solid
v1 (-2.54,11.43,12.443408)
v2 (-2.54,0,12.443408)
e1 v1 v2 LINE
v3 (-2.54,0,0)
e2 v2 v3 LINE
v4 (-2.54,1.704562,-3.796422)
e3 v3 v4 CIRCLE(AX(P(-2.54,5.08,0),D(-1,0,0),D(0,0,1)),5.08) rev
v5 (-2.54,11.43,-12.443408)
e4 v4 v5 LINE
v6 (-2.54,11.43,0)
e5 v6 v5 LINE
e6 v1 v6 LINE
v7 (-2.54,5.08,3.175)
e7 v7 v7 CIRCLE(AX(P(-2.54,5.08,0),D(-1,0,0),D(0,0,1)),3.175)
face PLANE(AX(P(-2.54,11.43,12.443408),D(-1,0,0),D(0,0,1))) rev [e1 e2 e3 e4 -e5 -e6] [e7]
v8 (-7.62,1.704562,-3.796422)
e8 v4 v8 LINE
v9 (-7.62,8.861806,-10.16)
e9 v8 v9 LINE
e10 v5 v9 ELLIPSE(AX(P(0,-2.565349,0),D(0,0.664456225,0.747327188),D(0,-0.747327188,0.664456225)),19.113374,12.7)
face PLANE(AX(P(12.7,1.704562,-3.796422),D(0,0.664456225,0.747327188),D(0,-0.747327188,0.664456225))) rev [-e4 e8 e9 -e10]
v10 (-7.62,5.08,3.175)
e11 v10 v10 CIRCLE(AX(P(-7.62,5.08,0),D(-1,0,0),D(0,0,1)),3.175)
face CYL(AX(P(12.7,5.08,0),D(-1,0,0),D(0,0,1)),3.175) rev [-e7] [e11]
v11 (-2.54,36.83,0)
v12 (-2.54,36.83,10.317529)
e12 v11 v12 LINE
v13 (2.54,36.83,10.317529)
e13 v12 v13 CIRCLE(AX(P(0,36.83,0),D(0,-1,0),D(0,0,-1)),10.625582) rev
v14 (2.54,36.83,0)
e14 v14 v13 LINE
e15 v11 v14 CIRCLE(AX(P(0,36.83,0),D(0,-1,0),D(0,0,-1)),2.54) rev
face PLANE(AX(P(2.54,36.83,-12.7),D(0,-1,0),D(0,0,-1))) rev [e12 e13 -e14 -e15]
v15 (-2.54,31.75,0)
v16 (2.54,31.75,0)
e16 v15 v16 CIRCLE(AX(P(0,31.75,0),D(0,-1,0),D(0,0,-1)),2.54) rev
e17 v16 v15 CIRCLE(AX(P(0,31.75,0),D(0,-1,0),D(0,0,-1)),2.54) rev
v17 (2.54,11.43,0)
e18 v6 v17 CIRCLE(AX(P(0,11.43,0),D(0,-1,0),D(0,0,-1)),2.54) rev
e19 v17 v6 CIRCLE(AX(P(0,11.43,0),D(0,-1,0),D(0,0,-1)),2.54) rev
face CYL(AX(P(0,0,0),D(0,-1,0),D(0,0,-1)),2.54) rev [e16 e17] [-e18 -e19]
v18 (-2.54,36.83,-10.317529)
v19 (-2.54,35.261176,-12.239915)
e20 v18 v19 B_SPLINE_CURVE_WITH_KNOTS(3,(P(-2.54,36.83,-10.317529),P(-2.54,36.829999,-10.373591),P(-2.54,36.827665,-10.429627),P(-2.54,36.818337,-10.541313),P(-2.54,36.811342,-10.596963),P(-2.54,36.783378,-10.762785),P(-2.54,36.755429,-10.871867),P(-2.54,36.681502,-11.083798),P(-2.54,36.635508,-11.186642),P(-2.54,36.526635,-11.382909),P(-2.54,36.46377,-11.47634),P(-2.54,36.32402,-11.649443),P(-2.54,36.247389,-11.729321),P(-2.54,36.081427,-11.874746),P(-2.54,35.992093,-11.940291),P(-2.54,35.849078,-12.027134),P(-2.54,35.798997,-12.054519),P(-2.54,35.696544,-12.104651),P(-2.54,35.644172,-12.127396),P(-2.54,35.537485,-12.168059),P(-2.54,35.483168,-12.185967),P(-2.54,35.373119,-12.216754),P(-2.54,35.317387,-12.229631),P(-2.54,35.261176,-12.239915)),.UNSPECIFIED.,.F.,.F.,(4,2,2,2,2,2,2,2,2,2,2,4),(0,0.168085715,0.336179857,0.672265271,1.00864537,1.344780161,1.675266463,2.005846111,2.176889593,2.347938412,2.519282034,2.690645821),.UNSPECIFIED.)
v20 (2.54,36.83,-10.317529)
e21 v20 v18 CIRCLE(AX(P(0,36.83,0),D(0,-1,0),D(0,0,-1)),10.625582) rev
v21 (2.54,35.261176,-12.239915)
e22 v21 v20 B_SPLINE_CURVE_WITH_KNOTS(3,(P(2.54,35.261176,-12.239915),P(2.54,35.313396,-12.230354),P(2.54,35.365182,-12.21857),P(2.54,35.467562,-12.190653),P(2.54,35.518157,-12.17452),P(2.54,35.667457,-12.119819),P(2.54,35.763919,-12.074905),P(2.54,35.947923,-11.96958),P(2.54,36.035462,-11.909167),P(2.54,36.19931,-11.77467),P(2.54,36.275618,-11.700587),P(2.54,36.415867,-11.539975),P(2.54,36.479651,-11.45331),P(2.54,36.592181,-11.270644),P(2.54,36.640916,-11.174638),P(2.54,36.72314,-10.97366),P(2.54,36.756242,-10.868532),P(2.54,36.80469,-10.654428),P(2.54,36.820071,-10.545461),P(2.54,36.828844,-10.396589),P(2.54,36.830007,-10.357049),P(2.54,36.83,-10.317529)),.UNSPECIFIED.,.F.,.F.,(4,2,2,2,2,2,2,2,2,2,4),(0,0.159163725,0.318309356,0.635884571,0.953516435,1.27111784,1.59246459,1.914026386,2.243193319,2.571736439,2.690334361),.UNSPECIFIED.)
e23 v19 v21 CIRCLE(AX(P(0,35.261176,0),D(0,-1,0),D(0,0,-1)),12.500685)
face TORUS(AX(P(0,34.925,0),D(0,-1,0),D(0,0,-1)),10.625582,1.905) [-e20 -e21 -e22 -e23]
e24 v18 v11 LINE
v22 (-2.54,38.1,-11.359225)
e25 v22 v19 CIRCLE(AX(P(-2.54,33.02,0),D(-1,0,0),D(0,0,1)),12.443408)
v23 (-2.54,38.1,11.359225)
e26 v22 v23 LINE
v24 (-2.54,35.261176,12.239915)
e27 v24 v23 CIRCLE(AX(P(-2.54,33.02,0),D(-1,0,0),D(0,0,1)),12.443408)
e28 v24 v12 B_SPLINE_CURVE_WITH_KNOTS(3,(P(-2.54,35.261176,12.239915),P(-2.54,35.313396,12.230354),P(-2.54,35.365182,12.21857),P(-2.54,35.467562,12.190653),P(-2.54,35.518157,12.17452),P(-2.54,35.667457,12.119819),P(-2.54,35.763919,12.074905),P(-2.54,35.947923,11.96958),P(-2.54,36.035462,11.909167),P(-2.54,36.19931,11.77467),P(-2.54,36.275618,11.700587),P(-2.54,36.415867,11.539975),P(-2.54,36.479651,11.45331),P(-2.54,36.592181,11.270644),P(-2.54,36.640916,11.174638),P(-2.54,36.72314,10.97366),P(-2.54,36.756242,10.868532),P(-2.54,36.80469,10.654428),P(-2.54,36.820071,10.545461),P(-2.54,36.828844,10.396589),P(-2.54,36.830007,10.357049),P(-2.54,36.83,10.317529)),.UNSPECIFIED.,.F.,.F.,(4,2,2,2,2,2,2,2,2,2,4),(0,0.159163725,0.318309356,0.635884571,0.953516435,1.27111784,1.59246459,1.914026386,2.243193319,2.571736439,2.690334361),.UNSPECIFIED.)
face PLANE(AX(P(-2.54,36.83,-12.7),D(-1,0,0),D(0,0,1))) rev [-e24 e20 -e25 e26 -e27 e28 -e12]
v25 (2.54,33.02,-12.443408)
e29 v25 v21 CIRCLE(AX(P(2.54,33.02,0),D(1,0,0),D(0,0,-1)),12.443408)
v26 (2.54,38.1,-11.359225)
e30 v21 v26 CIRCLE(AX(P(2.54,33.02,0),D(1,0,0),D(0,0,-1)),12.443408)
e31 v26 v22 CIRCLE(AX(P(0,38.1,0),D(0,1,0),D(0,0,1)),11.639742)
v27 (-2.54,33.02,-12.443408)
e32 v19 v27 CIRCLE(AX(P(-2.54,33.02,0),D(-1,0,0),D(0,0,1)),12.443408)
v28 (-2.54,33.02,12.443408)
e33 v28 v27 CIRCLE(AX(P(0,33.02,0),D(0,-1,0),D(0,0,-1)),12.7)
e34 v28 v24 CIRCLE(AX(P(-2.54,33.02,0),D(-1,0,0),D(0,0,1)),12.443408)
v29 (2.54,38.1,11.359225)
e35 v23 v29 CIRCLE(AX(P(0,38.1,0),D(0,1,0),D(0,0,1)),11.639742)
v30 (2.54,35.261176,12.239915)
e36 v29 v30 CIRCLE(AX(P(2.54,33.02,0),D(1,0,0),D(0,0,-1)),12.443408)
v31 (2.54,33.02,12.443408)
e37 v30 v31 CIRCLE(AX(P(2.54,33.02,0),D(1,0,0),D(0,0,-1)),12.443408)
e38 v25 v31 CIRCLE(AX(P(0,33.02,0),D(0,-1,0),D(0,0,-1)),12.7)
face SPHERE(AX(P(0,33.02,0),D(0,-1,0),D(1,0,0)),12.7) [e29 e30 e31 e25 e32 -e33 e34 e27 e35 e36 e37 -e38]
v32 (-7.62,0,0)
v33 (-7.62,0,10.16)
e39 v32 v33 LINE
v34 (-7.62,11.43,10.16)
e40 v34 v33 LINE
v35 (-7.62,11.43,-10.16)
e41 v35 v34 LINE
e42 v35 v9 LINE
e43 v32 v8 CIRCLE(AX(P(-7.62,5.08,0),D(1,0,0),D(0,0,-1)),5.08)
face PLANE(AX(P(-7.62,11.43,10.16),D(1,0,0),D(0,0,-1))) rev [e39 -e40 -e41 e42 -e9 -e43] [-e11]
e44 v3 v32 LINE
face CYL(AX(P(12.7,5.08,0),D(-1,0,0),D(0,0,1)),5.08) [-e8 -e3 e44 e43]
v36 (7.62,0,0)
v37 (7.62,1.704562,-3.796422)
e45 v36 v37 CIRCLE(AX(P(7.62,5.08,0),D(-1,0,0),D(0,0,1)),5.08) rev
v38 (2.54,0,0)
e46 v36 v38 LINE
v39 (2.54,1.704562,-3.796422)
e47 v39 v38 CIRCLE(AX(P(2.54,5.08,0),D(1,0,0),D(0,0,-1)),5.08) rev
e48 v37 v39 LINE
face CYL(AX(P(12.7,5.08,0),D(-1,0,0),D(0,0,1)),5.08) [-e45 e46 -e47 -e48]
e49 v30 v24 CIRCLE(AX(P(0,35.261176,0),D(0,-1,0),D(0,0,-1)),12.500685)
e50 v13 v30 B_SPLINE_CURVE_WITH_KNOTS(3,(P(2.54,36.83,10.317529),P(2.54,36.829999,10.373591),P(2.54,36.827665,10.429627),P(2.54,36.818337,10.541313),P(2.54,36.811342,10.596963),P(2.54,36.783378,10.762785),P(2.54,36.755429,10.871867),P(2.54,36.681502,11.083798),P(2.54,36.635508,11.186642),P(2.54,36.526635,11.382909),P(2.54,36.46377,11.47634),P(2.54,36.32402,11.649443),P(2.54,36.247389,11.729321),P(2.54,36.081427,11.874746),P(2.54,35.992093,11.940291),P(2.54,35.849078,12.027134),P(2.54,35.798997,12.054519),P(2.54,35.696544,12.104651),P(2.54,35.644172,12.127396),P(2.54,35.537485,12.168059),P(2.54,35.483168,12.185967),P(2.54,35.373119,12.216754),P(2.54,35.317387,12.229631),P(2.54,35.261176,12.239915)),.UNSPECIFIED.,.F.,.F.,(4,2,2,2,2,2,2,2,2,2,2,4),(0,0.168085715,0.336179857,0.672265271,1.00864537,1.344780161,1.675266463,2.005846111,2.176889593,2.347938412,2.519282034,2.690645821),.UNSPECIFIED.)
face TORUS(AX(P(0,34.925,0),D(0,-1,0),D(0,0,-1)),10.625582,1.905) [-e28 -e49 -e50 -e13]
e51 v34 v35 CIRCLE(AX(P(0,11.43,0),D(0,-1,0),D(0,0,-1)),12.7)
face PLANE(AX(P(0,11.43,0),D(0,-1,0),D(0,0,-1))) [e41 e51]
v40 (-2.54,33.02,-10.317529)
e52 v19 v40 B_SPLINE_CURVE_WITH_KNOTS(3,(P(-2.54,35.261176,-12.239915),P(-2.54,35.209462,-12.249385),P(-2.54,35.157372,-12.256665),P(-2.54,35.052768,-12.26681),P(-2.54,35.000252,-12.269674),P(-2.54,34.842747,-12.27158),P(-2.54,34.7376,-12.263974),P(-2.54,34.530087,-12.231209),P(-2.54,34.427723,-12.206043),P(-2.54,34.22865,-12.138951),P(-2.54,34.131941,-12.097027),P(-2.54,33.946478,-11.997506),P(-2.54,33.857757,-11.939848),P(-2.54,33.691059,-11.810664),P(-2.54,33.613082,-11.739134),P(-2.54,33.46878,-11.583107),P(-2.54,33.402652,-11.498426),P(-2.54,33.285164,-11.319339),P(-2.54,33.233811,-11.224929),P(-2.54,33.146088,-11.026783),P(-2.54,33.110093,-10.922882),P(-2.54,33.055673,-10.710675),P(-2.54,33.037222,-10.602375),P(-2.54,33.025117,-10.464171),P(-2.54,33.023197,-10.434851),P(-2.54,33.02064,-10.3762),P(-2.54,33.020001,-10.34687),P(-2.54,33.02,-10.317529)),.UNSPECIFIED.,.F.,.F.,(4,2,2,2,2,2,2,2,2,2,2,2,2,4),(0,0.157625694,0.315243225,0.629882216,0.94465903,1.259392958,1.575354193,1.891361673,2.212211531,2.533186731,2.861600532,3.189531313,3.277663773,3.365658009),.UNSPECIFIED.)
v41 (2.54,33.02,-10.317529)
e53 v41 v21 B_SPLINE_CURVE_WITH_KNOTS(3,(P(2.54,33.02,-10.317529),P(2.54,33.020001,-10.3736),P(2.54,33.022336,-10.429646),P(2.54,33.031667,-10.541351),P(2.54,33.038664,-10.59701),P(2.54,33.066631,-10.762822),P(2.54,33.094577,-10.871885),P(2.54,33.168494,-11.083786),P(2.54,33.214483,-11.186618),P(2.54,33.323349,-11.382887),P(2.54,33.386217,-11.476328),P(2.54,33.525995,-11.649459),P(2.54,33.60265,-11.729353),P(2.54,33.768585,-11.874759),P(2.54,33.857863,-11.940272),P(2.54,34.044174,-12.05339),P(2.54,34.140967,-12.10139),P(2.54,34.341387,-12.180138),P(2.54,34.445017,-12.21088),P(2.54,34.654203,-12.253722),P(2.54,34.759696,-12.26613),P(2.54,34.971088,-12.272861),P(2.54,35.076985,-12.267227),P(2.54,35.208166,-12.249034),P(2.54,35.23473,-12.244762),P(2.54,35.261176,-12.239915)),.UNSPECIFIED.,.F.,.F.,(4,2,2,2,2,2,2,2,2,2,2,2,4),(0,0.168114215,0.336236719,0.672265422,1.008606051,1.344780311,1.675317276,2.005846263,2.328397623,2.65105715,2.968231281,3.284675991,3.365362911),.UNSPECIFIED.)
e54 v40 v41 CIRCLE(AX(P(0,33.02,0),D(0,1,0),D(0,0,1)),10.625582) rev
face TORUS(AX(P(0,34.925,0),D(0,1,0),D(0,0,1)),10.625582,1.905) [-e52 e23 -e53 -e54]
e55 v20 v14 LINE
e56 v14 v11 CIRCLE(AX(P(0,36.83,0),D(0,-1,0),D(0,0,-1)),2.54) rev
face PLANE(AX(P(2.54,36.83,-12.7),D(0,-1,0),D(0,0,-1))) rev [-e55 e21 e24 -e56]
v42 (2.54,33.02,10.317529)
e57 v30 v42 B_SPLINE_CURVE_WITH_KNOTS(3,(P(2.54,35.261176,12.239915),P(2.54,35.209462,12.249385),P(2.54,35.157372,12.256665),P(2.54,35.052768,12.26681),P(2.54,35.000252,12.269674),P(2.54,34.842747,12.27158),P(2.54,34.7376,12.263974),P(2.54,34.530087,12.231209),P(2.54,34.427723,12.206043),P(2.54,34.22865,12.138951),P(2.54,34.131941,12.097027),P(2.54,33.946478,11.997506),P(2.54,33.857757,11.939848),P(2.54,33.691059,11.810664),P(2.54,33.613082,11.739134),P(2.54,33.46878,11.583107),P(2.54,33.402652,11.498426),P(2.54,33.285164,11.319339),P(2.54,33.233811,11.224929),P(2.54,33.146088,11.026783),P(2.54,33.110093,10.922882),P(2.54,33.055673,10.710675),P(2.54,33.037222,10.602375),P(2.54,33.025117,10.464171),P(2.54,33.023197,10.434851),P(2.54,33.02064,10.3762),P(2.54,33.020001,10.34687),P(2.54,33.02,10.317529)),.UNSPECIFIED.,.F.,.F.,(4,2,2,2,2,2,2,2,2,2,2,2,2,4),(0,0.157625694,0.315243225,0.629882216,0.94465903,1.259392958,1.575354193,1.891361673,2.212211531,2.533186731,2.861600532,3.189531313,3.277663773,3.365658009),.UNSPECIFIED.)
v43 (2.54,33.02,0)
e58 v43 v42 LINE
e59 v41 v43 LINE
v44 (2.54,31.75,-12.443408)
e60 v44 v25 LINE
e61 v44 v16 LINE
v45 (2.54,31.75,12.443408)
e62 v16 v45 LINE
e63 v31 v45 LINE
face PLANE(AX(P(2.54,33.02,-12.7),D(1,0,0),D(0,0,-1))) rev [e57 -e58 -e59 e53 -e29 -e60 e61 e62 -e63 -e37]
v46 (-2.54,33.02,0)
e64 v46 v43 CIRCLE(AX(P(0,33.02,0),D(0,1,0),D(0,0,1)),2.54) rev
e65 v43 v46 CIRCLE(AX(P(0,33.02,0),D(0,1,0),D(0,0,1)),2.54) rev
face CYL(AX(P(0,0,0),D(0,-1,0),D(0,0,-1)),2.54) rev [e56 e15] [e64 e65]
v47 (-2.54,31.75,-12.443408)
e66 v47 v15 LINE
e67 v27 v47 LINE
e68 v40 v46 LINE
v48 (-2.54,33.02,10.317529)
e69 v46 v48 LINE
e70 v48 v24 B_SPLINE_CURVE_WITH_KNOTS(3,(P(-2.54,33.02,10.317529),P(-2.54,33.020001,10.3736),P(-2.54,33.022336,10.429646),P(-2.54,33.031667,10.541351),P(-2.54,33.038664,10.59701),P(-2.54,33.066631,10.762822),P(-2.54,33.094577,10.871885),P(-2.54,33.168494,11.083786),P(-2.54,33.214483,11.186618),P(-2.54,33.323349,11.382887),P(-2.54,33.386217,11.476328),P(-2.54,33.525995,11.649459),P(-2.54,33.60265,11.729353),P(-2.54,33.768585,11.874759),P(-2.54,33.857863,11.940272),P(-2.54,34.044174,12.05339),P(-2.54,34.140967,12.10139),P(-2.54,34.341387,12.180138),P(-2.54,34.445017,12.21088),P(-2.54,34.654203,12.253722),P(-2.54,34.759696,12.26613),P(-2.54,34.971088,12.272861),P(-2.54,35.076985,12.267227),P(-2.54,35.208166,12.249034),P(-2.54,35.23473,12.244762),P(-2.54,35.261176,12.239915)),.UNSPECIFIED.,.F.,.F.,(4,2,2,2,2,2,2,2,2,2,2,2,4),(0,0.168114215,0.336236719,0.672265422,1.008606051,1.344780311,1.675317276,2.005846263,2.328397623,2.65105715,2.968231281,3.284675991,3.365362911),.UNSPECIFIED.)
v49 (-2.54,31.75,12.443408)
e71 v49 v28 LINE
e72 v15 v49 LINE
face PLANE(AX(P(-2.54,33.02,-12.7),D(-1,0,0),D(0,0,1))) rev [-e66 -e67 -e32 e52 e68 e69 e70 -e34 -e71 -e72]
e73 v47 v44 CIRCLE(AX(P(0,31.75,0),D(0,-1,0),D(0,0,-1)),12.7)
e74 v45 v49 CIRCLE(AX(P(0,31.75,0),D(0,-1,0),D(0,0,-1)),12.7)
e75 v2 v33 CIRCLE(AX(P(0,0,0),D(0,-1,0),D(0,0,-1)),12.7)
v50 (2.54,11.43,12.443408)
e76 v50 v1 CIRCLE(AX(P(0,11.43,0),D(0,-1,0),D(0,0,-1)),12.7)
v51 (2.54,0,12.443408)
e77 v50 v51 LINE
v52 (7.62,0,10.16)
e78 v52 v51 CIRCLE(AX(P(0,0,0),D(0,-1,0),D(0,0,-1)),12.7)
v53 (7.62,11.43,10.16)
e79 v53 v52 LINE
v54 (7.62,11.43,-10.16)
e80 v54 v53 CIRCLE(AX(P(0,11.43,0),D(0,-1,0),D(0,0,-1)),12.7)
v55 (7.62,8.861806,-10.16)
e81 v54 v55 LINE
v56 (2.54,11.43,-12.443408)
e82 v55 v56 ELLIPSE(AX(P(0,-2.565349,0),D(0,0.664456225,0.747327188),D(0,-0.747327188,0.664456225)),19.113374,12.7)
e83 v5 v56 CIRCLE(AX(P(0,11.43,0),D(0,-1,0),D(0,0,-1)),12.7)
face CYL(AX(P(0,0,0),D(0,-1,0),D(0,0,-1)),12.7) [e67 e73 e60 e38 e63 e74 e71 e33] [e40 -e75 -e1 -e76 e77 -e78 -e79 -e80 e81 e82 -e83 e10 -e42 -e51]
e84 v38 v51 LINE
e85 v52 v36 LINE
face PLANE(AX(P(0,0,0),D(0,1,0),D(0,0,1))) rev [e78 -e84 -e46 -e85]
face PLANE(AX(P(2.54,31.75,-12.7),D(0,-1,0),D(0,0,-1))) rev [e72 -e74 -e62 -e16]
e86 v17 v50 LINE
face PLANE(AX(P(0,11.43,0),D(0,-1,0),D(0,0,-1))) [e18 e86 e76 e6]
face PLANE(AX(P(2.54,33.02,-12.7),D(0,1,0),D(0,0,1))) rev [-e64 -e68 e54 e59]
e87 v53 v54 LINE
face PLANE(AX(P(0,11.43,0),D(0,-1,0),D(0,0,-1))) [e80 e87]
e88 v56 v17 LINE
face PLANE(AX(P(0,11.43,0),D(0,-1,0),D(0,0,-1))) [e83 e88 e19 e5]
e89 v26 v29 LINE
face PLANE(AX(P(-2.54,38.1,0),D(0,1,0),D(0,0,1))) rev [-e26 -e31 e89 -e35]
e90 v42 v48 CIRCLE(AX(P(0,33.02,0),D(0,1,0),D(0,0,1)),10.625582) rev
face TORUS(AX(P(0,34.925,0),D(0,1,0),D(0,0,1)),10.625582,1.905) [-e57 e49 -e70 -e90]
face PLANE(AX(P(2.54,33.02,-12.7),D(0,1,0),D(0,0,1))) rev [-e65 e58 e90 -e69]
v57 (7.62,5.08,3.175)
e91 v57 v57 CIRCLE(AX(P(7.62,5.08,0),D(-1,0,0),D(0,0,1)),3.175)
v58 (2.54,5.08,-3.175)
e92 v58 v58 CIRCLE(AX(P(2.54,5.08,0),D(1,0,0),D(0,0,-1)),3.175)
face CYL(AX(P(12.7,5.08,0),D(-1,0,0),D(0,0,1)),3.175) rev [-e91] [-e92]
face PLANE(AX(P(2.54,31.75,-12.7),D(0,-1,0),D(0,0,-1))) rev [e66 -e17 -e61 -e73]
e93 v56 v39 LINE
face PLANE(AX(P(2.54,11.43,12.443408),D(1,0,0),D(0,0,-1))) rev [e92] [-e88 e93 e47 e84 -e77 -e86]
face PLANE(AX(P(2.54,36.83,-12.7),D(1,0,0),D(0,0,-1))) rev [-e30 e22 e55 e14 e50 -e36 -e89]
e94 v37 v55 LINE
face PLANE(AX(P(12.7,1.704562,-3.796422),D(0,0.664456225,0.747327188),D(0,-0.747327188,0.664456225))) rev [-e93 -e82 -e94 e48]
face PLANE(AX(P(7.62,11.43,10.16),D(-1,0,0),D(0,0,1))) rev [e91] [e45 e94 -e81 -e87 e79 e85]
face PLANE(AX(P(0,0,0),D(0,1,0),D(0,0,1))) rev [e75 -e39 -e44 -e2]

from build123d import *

# Parameters (mm, degrees)
CUT_EXTRUDE1_DEPTH      = 11.43
SKETCH3_R               = 3.175
CUT_EXTRUDE2_DEPTH      = 52.61889964
CUT_EXTRUDE3_DEPTH      = 50.121262199
CUT_EXTRUDE3_DEPTH_BACK = 50.121262199
SKETCH4_W               = 5.08
SKETCH4_H               = 1.27
FILLET1_R               = 1.905


with BuildPart() as part:
    # Sketch1 → Revolve1 (revolve)
    with BuildSketch(Plane.XY, mode=Mode.PRIVATE) as revolve1_sk:
        with BuildLine():
            Line((0, 0), (0, 5.602635041))
            Line((0, 5.602635041), (-2.54, 5.602635041))
            Line((-2.54, 5.602635041), (-2.54, 38.1))
            Line((-2.54, 38.1), (0, 38.1))
            Line((0, 38.1), (0, 45.72))
            ThreePointArc((0, 45.72), (-8.980256121, 42.000256121), (-12.7, 33.02))
            Line((-12.7, 33.02), (-12.7, 0))
            Line((-12.7, 0), (0, 0))
        make_face()
    revolve(revolve1_sk.sketch.rotate(Axis((0, 0, 0), (0, 1, 0)), 270), axis=Axis((0, 0, 0), (0, 1, 0)))

    # Sketch2 → Cut-Extrude1 (cut)
    with BuildSketch(Plane.XZ):
        with BuildLine():
            Line((-2.54, 12.443407893), (-2.54, -12.443407893))
            ThreePointArc((-2.54, -12.443407893), (0, -12.7), (2.54, -12.443407893))
            Line((2.54, -12.443407893), (2.54, 12.443407893))
            ThreePointArc((2.54, 12.443407893), (0, 12.7), (-2.54, 12.443407893))
        make_face()
        with BuildLine():
            Line((-7.62, 10.16), (-7.62, -10.16))
            ThreePointArc((-7.62, -10.16), (-12.7, 0), (-7.62, 10.16))
        make_face()
        with BuildLine():
            Line((7.62, 10.16), (7.62, -10.16))
            ThreePointArc((7.62, -10.16), (12.7, 0), (7.62, 10.16))
        make_face()
    extrude(amount=-CUT_EXTRUDE1_DEPTH, mode=Mode.SUBTRACT)

    # Sketch3 → Cut-Extrude2 (cut, through all)
    with BuildSketch(Plane.ZY.offset(7.62)):
        with Locations((0, 5.08)):
            Circle(SKETCH3_R)
        with BuildLine():
            Line((0, 0), (-12.443407893, 0))
            Line((-12.443407893, 0), (-12.443407893, 11.43))
            Line((-12.443407893, 11.43), (-3.796422114, 1.704562379))
            ThreePointArc((-3.796422114, 1.704562379), (-2.080766311, 0.445691901), (0, 0))
        make_face()
    extrude(amount=-CUT_EXTRUDE2_DEPTH, mode=Mode.SUBTRACT)

    # Sketch4 → Cut-Extrude3 (cut, two sides: drawn at the far end of the back side and taken through both)
    with BuildSketch(Plane.XY.offset(-CUT_EXTRUDE3_DEPTH_BACK)):
        with Locations((0, 32.385)):
            Rectangle(SKETCH4_W, SKETCH4_H)
        with Locations((0, 37.465)):
            Rectangle(SKETCH4_W, SKETCH4_H)
    extrude(amount=CUT_EXTRUDE3_DEPTH + CUT_EXTRUDE3_DEPTH_BACK, mode=Mode.SUBTRACT)

    # Fillet1
    # the kernel refuses this fillet: 1.905 mm, written as the material it takes off along each edge
    with BuildSketch(Plane(origin=(0, 33.02, 0), x_dir=(-0.60062876969462, 0, 0.7995280364159391), z_dir=(-0.7995280364159391, 0, -0.60062876969462))) as fillet1_piece_1_section:
        with BuildLine():
            CenterArc((10.625582337, 1.905), FILLET1_R, 270, 100.164248622)
            Line((10.625582337, 0), (12.7, 0))
            ThreePointArc((12.7, 0), (12.650073138, 1.125010933), (12.500685102, 2.241176471))
        make_face()
    fillet1_piece_1 = revolve(axis=Axis((0, 33.02, 0), (0, 1, 0)), revolution_arc=73.829886486, mode=Mode.PRIVATE)
    fillet1_piece_1 = split(fillet1_piece_1, bisect_by=Plane(origin=(2.54, 33.536908465, 12.1243087), z_dir=(-1, 0, 0)), keep=Keep.TOP, mode=Mode.PRIVATE)
    fillet1_piece_1 = split(fillet1_piece_1, bisect_by=Plane(origin=(-2.54, 33.536908465, 12.1243087), z_dir=(1, 0, 0)), keep=Keep.TOP, mode=Mode.PRIVATE)
    add(fillet1_piece_1, mode=Mode.SUBTRACT)
    with BuildSketch(Plane(origin=(0, 36.83, 0), x_dir=(0.5180820301307626, 0, 0.8553309359865265), z_dir=(0.8553309359865265, 0, -0.5180820301307626))) as fillet1_piece_2_section:
        with BuildLine():
            CenterArc((10.625582337, 1.905), FILLET1_R, 270, 79.835751378)
            Line((10.625582337, 0), (12.115027858, 0))
            ThreePointArc((12.115027858, 0), (12.332827452, 0.778273257), (12.500685102, 1.568823529))
        make_face()
    fillet1_piece_2 = revolve(axis=Axis((0, 36.83, 0), (0, -1, 0)), revolution_arc=62.407371172, mode=Mode.PRIVATE)
    fillet1_piece_2 = split(fillet1_piece_2, bisect_by=Plane(origin=(2.54, 36.48222625, 11.799196002), z_dir=(-1, 0, 0)), keep=Keep.TOP, mode=Mode.PRIVATE)
    fillet1_piece_2 = split(fillet1_piece_2, bisect_by=Plane(origin=(-2.54, 36.48222625, 11.799196002), z_dir=(1, 0, 0)), keep=Keep.TOP, mode=Mode.PRIVATE)
    add(fillet1_piece_2, mode=Mode.SUBTRACT)
    with BuildSketch(Plane(origin=(0, 36.83, 0), x_dir=(-0.5180758180945624, 0, -0.8553346986447176), z_dir=(-0.8553346986447176, 0, 0.5180758180945624))) as fillet1_piece_3_section:
        with BuildLine():
            CenterArc((10.625582337, 1.905), FILLET1_R, 270, 79.835751378)
            Line((10.625582337, 0), (12.115027858, 0))
            ThreePointArc((12.115027858, 0), (12.332827452, 0.778273257), (12.500685102, 1.568823529))
        make_face()
    fillet1_piece_3 = revolve(axis=Axis((0, 36.83, 0), (0, -1, 0)), revolution_arc=31.203269463, mode=Mode.PRIVATE)
    fillet1_piece_3 = split(fillet1_piece_3, bisect_by=Plane(origin=(-2.54, 36.482226182, -11.799196273), z_dir=(1, 0, 0)), keep=Keep.TOP, mode=Mode.PRIVATE)
    add(fillet1_piece_3, mode=Mode.SUBTRACT)
    with BuildSketch(Plane(origin=(0, 33.02, 0), x_dir=(0.6006217587640166, 0, -0.7995333031833131), z_dir=(0.7995333031833131, 0, 0.6006217587640166))) as fillet1_piece_4_section:
        with BuildLine():
            CenterArc((10.625582337, 1.905), FILLET1_R, 270, 100.164248622)
            Line((10.625582337, 0), (12.7, 0))
            ThreePointArc((12.7, 0), (12.650073138, 1.125010933), (12.500685102, 2.241176471))
        make_face()
    fillet1_piece_4 = revolve(axis=Axis((0, 33.02, 0), (0, 1, 0)), revolution_arc=36.914440828, mode=Mode.PRIVATE)
    fillet1_piece_4 = split(fillet1_piece_4, bisect_by=Plane(origin=(2.54, 33.536908471, -12.124308945), z_dir=(-1, 0, 0)), keep=Keep.TOP, mode=Mode.PRIVATE)
    add(fillet1_piece_4, mode=Mode.SUBTRACT)
    with BuildSketch(Plane(origin=(0, 33.02, 0), x_dir=(0, 0, -1), z_dir=(1, 0, 0))) as fillet1_piece_5_section:
        with BuildLine():
            CenterArc((10.625582337, 1.905), FILLET1_R, 270, 100.164248622)
            Line((10.625582337, 0), (12.7, 0))
            ThreePointArc((12.7, 0), (12.650073138, 1.125010933), (12.500685102, 2.241176471))
        make_face()
    fillet1_piece_5 = revolve(axis=Axis((0, 33.02, 0), (0, 1, 0)), revolution_arc=36.914440828, mode=Mode.PRIVATE)
    fillet1_piece_5 = split(fillet1_piece_5, bisect_by=Plane(origin=(-2.54, 33.536908442, -12.124308642), z_dir=(1, 0, 0)), keep=Keep.TOP, mode=Mode.PRIVATE)
    add(fillet1_piece_5, mode=Mode.SUBTRACT)
    with BuildSketch(Plane(origin=(0, 36.83, 0), x_dir=(0, 0, -1), z_dir=(-1, 0, 0))) as fillet1_piece_6_section:
        with BuildLine():
            CenterArc((10.625582337, 1.905), FILLET1_R, 270, 79.835751378)
            Line((10.625582337, 0), (12.115027858, 0))
            ThreePointArc((12.115027858, 0), (12.332827452, 0.778273257), (12.500685102, 1.568823529))
        make_face()
    fillet1_piece_6 = revolve(axis=Axis((0, 36.83, 0), (0, -1, 0)), revolution_arc=31.203269463, mode=Mode.PRIVATE)
    fillet1_piece_6 = split(fillet1_piece_6, bisect_by=Plane(origin=(2.54, 36.482226255, -11.799195907), z_dir=(-1, 0, 0)), keep=Keep.TOP, mode=Mode.PRIVATE)
    add(fillet1_piece_6, mode=Mode.SUBTRACT)


solid = part.part
